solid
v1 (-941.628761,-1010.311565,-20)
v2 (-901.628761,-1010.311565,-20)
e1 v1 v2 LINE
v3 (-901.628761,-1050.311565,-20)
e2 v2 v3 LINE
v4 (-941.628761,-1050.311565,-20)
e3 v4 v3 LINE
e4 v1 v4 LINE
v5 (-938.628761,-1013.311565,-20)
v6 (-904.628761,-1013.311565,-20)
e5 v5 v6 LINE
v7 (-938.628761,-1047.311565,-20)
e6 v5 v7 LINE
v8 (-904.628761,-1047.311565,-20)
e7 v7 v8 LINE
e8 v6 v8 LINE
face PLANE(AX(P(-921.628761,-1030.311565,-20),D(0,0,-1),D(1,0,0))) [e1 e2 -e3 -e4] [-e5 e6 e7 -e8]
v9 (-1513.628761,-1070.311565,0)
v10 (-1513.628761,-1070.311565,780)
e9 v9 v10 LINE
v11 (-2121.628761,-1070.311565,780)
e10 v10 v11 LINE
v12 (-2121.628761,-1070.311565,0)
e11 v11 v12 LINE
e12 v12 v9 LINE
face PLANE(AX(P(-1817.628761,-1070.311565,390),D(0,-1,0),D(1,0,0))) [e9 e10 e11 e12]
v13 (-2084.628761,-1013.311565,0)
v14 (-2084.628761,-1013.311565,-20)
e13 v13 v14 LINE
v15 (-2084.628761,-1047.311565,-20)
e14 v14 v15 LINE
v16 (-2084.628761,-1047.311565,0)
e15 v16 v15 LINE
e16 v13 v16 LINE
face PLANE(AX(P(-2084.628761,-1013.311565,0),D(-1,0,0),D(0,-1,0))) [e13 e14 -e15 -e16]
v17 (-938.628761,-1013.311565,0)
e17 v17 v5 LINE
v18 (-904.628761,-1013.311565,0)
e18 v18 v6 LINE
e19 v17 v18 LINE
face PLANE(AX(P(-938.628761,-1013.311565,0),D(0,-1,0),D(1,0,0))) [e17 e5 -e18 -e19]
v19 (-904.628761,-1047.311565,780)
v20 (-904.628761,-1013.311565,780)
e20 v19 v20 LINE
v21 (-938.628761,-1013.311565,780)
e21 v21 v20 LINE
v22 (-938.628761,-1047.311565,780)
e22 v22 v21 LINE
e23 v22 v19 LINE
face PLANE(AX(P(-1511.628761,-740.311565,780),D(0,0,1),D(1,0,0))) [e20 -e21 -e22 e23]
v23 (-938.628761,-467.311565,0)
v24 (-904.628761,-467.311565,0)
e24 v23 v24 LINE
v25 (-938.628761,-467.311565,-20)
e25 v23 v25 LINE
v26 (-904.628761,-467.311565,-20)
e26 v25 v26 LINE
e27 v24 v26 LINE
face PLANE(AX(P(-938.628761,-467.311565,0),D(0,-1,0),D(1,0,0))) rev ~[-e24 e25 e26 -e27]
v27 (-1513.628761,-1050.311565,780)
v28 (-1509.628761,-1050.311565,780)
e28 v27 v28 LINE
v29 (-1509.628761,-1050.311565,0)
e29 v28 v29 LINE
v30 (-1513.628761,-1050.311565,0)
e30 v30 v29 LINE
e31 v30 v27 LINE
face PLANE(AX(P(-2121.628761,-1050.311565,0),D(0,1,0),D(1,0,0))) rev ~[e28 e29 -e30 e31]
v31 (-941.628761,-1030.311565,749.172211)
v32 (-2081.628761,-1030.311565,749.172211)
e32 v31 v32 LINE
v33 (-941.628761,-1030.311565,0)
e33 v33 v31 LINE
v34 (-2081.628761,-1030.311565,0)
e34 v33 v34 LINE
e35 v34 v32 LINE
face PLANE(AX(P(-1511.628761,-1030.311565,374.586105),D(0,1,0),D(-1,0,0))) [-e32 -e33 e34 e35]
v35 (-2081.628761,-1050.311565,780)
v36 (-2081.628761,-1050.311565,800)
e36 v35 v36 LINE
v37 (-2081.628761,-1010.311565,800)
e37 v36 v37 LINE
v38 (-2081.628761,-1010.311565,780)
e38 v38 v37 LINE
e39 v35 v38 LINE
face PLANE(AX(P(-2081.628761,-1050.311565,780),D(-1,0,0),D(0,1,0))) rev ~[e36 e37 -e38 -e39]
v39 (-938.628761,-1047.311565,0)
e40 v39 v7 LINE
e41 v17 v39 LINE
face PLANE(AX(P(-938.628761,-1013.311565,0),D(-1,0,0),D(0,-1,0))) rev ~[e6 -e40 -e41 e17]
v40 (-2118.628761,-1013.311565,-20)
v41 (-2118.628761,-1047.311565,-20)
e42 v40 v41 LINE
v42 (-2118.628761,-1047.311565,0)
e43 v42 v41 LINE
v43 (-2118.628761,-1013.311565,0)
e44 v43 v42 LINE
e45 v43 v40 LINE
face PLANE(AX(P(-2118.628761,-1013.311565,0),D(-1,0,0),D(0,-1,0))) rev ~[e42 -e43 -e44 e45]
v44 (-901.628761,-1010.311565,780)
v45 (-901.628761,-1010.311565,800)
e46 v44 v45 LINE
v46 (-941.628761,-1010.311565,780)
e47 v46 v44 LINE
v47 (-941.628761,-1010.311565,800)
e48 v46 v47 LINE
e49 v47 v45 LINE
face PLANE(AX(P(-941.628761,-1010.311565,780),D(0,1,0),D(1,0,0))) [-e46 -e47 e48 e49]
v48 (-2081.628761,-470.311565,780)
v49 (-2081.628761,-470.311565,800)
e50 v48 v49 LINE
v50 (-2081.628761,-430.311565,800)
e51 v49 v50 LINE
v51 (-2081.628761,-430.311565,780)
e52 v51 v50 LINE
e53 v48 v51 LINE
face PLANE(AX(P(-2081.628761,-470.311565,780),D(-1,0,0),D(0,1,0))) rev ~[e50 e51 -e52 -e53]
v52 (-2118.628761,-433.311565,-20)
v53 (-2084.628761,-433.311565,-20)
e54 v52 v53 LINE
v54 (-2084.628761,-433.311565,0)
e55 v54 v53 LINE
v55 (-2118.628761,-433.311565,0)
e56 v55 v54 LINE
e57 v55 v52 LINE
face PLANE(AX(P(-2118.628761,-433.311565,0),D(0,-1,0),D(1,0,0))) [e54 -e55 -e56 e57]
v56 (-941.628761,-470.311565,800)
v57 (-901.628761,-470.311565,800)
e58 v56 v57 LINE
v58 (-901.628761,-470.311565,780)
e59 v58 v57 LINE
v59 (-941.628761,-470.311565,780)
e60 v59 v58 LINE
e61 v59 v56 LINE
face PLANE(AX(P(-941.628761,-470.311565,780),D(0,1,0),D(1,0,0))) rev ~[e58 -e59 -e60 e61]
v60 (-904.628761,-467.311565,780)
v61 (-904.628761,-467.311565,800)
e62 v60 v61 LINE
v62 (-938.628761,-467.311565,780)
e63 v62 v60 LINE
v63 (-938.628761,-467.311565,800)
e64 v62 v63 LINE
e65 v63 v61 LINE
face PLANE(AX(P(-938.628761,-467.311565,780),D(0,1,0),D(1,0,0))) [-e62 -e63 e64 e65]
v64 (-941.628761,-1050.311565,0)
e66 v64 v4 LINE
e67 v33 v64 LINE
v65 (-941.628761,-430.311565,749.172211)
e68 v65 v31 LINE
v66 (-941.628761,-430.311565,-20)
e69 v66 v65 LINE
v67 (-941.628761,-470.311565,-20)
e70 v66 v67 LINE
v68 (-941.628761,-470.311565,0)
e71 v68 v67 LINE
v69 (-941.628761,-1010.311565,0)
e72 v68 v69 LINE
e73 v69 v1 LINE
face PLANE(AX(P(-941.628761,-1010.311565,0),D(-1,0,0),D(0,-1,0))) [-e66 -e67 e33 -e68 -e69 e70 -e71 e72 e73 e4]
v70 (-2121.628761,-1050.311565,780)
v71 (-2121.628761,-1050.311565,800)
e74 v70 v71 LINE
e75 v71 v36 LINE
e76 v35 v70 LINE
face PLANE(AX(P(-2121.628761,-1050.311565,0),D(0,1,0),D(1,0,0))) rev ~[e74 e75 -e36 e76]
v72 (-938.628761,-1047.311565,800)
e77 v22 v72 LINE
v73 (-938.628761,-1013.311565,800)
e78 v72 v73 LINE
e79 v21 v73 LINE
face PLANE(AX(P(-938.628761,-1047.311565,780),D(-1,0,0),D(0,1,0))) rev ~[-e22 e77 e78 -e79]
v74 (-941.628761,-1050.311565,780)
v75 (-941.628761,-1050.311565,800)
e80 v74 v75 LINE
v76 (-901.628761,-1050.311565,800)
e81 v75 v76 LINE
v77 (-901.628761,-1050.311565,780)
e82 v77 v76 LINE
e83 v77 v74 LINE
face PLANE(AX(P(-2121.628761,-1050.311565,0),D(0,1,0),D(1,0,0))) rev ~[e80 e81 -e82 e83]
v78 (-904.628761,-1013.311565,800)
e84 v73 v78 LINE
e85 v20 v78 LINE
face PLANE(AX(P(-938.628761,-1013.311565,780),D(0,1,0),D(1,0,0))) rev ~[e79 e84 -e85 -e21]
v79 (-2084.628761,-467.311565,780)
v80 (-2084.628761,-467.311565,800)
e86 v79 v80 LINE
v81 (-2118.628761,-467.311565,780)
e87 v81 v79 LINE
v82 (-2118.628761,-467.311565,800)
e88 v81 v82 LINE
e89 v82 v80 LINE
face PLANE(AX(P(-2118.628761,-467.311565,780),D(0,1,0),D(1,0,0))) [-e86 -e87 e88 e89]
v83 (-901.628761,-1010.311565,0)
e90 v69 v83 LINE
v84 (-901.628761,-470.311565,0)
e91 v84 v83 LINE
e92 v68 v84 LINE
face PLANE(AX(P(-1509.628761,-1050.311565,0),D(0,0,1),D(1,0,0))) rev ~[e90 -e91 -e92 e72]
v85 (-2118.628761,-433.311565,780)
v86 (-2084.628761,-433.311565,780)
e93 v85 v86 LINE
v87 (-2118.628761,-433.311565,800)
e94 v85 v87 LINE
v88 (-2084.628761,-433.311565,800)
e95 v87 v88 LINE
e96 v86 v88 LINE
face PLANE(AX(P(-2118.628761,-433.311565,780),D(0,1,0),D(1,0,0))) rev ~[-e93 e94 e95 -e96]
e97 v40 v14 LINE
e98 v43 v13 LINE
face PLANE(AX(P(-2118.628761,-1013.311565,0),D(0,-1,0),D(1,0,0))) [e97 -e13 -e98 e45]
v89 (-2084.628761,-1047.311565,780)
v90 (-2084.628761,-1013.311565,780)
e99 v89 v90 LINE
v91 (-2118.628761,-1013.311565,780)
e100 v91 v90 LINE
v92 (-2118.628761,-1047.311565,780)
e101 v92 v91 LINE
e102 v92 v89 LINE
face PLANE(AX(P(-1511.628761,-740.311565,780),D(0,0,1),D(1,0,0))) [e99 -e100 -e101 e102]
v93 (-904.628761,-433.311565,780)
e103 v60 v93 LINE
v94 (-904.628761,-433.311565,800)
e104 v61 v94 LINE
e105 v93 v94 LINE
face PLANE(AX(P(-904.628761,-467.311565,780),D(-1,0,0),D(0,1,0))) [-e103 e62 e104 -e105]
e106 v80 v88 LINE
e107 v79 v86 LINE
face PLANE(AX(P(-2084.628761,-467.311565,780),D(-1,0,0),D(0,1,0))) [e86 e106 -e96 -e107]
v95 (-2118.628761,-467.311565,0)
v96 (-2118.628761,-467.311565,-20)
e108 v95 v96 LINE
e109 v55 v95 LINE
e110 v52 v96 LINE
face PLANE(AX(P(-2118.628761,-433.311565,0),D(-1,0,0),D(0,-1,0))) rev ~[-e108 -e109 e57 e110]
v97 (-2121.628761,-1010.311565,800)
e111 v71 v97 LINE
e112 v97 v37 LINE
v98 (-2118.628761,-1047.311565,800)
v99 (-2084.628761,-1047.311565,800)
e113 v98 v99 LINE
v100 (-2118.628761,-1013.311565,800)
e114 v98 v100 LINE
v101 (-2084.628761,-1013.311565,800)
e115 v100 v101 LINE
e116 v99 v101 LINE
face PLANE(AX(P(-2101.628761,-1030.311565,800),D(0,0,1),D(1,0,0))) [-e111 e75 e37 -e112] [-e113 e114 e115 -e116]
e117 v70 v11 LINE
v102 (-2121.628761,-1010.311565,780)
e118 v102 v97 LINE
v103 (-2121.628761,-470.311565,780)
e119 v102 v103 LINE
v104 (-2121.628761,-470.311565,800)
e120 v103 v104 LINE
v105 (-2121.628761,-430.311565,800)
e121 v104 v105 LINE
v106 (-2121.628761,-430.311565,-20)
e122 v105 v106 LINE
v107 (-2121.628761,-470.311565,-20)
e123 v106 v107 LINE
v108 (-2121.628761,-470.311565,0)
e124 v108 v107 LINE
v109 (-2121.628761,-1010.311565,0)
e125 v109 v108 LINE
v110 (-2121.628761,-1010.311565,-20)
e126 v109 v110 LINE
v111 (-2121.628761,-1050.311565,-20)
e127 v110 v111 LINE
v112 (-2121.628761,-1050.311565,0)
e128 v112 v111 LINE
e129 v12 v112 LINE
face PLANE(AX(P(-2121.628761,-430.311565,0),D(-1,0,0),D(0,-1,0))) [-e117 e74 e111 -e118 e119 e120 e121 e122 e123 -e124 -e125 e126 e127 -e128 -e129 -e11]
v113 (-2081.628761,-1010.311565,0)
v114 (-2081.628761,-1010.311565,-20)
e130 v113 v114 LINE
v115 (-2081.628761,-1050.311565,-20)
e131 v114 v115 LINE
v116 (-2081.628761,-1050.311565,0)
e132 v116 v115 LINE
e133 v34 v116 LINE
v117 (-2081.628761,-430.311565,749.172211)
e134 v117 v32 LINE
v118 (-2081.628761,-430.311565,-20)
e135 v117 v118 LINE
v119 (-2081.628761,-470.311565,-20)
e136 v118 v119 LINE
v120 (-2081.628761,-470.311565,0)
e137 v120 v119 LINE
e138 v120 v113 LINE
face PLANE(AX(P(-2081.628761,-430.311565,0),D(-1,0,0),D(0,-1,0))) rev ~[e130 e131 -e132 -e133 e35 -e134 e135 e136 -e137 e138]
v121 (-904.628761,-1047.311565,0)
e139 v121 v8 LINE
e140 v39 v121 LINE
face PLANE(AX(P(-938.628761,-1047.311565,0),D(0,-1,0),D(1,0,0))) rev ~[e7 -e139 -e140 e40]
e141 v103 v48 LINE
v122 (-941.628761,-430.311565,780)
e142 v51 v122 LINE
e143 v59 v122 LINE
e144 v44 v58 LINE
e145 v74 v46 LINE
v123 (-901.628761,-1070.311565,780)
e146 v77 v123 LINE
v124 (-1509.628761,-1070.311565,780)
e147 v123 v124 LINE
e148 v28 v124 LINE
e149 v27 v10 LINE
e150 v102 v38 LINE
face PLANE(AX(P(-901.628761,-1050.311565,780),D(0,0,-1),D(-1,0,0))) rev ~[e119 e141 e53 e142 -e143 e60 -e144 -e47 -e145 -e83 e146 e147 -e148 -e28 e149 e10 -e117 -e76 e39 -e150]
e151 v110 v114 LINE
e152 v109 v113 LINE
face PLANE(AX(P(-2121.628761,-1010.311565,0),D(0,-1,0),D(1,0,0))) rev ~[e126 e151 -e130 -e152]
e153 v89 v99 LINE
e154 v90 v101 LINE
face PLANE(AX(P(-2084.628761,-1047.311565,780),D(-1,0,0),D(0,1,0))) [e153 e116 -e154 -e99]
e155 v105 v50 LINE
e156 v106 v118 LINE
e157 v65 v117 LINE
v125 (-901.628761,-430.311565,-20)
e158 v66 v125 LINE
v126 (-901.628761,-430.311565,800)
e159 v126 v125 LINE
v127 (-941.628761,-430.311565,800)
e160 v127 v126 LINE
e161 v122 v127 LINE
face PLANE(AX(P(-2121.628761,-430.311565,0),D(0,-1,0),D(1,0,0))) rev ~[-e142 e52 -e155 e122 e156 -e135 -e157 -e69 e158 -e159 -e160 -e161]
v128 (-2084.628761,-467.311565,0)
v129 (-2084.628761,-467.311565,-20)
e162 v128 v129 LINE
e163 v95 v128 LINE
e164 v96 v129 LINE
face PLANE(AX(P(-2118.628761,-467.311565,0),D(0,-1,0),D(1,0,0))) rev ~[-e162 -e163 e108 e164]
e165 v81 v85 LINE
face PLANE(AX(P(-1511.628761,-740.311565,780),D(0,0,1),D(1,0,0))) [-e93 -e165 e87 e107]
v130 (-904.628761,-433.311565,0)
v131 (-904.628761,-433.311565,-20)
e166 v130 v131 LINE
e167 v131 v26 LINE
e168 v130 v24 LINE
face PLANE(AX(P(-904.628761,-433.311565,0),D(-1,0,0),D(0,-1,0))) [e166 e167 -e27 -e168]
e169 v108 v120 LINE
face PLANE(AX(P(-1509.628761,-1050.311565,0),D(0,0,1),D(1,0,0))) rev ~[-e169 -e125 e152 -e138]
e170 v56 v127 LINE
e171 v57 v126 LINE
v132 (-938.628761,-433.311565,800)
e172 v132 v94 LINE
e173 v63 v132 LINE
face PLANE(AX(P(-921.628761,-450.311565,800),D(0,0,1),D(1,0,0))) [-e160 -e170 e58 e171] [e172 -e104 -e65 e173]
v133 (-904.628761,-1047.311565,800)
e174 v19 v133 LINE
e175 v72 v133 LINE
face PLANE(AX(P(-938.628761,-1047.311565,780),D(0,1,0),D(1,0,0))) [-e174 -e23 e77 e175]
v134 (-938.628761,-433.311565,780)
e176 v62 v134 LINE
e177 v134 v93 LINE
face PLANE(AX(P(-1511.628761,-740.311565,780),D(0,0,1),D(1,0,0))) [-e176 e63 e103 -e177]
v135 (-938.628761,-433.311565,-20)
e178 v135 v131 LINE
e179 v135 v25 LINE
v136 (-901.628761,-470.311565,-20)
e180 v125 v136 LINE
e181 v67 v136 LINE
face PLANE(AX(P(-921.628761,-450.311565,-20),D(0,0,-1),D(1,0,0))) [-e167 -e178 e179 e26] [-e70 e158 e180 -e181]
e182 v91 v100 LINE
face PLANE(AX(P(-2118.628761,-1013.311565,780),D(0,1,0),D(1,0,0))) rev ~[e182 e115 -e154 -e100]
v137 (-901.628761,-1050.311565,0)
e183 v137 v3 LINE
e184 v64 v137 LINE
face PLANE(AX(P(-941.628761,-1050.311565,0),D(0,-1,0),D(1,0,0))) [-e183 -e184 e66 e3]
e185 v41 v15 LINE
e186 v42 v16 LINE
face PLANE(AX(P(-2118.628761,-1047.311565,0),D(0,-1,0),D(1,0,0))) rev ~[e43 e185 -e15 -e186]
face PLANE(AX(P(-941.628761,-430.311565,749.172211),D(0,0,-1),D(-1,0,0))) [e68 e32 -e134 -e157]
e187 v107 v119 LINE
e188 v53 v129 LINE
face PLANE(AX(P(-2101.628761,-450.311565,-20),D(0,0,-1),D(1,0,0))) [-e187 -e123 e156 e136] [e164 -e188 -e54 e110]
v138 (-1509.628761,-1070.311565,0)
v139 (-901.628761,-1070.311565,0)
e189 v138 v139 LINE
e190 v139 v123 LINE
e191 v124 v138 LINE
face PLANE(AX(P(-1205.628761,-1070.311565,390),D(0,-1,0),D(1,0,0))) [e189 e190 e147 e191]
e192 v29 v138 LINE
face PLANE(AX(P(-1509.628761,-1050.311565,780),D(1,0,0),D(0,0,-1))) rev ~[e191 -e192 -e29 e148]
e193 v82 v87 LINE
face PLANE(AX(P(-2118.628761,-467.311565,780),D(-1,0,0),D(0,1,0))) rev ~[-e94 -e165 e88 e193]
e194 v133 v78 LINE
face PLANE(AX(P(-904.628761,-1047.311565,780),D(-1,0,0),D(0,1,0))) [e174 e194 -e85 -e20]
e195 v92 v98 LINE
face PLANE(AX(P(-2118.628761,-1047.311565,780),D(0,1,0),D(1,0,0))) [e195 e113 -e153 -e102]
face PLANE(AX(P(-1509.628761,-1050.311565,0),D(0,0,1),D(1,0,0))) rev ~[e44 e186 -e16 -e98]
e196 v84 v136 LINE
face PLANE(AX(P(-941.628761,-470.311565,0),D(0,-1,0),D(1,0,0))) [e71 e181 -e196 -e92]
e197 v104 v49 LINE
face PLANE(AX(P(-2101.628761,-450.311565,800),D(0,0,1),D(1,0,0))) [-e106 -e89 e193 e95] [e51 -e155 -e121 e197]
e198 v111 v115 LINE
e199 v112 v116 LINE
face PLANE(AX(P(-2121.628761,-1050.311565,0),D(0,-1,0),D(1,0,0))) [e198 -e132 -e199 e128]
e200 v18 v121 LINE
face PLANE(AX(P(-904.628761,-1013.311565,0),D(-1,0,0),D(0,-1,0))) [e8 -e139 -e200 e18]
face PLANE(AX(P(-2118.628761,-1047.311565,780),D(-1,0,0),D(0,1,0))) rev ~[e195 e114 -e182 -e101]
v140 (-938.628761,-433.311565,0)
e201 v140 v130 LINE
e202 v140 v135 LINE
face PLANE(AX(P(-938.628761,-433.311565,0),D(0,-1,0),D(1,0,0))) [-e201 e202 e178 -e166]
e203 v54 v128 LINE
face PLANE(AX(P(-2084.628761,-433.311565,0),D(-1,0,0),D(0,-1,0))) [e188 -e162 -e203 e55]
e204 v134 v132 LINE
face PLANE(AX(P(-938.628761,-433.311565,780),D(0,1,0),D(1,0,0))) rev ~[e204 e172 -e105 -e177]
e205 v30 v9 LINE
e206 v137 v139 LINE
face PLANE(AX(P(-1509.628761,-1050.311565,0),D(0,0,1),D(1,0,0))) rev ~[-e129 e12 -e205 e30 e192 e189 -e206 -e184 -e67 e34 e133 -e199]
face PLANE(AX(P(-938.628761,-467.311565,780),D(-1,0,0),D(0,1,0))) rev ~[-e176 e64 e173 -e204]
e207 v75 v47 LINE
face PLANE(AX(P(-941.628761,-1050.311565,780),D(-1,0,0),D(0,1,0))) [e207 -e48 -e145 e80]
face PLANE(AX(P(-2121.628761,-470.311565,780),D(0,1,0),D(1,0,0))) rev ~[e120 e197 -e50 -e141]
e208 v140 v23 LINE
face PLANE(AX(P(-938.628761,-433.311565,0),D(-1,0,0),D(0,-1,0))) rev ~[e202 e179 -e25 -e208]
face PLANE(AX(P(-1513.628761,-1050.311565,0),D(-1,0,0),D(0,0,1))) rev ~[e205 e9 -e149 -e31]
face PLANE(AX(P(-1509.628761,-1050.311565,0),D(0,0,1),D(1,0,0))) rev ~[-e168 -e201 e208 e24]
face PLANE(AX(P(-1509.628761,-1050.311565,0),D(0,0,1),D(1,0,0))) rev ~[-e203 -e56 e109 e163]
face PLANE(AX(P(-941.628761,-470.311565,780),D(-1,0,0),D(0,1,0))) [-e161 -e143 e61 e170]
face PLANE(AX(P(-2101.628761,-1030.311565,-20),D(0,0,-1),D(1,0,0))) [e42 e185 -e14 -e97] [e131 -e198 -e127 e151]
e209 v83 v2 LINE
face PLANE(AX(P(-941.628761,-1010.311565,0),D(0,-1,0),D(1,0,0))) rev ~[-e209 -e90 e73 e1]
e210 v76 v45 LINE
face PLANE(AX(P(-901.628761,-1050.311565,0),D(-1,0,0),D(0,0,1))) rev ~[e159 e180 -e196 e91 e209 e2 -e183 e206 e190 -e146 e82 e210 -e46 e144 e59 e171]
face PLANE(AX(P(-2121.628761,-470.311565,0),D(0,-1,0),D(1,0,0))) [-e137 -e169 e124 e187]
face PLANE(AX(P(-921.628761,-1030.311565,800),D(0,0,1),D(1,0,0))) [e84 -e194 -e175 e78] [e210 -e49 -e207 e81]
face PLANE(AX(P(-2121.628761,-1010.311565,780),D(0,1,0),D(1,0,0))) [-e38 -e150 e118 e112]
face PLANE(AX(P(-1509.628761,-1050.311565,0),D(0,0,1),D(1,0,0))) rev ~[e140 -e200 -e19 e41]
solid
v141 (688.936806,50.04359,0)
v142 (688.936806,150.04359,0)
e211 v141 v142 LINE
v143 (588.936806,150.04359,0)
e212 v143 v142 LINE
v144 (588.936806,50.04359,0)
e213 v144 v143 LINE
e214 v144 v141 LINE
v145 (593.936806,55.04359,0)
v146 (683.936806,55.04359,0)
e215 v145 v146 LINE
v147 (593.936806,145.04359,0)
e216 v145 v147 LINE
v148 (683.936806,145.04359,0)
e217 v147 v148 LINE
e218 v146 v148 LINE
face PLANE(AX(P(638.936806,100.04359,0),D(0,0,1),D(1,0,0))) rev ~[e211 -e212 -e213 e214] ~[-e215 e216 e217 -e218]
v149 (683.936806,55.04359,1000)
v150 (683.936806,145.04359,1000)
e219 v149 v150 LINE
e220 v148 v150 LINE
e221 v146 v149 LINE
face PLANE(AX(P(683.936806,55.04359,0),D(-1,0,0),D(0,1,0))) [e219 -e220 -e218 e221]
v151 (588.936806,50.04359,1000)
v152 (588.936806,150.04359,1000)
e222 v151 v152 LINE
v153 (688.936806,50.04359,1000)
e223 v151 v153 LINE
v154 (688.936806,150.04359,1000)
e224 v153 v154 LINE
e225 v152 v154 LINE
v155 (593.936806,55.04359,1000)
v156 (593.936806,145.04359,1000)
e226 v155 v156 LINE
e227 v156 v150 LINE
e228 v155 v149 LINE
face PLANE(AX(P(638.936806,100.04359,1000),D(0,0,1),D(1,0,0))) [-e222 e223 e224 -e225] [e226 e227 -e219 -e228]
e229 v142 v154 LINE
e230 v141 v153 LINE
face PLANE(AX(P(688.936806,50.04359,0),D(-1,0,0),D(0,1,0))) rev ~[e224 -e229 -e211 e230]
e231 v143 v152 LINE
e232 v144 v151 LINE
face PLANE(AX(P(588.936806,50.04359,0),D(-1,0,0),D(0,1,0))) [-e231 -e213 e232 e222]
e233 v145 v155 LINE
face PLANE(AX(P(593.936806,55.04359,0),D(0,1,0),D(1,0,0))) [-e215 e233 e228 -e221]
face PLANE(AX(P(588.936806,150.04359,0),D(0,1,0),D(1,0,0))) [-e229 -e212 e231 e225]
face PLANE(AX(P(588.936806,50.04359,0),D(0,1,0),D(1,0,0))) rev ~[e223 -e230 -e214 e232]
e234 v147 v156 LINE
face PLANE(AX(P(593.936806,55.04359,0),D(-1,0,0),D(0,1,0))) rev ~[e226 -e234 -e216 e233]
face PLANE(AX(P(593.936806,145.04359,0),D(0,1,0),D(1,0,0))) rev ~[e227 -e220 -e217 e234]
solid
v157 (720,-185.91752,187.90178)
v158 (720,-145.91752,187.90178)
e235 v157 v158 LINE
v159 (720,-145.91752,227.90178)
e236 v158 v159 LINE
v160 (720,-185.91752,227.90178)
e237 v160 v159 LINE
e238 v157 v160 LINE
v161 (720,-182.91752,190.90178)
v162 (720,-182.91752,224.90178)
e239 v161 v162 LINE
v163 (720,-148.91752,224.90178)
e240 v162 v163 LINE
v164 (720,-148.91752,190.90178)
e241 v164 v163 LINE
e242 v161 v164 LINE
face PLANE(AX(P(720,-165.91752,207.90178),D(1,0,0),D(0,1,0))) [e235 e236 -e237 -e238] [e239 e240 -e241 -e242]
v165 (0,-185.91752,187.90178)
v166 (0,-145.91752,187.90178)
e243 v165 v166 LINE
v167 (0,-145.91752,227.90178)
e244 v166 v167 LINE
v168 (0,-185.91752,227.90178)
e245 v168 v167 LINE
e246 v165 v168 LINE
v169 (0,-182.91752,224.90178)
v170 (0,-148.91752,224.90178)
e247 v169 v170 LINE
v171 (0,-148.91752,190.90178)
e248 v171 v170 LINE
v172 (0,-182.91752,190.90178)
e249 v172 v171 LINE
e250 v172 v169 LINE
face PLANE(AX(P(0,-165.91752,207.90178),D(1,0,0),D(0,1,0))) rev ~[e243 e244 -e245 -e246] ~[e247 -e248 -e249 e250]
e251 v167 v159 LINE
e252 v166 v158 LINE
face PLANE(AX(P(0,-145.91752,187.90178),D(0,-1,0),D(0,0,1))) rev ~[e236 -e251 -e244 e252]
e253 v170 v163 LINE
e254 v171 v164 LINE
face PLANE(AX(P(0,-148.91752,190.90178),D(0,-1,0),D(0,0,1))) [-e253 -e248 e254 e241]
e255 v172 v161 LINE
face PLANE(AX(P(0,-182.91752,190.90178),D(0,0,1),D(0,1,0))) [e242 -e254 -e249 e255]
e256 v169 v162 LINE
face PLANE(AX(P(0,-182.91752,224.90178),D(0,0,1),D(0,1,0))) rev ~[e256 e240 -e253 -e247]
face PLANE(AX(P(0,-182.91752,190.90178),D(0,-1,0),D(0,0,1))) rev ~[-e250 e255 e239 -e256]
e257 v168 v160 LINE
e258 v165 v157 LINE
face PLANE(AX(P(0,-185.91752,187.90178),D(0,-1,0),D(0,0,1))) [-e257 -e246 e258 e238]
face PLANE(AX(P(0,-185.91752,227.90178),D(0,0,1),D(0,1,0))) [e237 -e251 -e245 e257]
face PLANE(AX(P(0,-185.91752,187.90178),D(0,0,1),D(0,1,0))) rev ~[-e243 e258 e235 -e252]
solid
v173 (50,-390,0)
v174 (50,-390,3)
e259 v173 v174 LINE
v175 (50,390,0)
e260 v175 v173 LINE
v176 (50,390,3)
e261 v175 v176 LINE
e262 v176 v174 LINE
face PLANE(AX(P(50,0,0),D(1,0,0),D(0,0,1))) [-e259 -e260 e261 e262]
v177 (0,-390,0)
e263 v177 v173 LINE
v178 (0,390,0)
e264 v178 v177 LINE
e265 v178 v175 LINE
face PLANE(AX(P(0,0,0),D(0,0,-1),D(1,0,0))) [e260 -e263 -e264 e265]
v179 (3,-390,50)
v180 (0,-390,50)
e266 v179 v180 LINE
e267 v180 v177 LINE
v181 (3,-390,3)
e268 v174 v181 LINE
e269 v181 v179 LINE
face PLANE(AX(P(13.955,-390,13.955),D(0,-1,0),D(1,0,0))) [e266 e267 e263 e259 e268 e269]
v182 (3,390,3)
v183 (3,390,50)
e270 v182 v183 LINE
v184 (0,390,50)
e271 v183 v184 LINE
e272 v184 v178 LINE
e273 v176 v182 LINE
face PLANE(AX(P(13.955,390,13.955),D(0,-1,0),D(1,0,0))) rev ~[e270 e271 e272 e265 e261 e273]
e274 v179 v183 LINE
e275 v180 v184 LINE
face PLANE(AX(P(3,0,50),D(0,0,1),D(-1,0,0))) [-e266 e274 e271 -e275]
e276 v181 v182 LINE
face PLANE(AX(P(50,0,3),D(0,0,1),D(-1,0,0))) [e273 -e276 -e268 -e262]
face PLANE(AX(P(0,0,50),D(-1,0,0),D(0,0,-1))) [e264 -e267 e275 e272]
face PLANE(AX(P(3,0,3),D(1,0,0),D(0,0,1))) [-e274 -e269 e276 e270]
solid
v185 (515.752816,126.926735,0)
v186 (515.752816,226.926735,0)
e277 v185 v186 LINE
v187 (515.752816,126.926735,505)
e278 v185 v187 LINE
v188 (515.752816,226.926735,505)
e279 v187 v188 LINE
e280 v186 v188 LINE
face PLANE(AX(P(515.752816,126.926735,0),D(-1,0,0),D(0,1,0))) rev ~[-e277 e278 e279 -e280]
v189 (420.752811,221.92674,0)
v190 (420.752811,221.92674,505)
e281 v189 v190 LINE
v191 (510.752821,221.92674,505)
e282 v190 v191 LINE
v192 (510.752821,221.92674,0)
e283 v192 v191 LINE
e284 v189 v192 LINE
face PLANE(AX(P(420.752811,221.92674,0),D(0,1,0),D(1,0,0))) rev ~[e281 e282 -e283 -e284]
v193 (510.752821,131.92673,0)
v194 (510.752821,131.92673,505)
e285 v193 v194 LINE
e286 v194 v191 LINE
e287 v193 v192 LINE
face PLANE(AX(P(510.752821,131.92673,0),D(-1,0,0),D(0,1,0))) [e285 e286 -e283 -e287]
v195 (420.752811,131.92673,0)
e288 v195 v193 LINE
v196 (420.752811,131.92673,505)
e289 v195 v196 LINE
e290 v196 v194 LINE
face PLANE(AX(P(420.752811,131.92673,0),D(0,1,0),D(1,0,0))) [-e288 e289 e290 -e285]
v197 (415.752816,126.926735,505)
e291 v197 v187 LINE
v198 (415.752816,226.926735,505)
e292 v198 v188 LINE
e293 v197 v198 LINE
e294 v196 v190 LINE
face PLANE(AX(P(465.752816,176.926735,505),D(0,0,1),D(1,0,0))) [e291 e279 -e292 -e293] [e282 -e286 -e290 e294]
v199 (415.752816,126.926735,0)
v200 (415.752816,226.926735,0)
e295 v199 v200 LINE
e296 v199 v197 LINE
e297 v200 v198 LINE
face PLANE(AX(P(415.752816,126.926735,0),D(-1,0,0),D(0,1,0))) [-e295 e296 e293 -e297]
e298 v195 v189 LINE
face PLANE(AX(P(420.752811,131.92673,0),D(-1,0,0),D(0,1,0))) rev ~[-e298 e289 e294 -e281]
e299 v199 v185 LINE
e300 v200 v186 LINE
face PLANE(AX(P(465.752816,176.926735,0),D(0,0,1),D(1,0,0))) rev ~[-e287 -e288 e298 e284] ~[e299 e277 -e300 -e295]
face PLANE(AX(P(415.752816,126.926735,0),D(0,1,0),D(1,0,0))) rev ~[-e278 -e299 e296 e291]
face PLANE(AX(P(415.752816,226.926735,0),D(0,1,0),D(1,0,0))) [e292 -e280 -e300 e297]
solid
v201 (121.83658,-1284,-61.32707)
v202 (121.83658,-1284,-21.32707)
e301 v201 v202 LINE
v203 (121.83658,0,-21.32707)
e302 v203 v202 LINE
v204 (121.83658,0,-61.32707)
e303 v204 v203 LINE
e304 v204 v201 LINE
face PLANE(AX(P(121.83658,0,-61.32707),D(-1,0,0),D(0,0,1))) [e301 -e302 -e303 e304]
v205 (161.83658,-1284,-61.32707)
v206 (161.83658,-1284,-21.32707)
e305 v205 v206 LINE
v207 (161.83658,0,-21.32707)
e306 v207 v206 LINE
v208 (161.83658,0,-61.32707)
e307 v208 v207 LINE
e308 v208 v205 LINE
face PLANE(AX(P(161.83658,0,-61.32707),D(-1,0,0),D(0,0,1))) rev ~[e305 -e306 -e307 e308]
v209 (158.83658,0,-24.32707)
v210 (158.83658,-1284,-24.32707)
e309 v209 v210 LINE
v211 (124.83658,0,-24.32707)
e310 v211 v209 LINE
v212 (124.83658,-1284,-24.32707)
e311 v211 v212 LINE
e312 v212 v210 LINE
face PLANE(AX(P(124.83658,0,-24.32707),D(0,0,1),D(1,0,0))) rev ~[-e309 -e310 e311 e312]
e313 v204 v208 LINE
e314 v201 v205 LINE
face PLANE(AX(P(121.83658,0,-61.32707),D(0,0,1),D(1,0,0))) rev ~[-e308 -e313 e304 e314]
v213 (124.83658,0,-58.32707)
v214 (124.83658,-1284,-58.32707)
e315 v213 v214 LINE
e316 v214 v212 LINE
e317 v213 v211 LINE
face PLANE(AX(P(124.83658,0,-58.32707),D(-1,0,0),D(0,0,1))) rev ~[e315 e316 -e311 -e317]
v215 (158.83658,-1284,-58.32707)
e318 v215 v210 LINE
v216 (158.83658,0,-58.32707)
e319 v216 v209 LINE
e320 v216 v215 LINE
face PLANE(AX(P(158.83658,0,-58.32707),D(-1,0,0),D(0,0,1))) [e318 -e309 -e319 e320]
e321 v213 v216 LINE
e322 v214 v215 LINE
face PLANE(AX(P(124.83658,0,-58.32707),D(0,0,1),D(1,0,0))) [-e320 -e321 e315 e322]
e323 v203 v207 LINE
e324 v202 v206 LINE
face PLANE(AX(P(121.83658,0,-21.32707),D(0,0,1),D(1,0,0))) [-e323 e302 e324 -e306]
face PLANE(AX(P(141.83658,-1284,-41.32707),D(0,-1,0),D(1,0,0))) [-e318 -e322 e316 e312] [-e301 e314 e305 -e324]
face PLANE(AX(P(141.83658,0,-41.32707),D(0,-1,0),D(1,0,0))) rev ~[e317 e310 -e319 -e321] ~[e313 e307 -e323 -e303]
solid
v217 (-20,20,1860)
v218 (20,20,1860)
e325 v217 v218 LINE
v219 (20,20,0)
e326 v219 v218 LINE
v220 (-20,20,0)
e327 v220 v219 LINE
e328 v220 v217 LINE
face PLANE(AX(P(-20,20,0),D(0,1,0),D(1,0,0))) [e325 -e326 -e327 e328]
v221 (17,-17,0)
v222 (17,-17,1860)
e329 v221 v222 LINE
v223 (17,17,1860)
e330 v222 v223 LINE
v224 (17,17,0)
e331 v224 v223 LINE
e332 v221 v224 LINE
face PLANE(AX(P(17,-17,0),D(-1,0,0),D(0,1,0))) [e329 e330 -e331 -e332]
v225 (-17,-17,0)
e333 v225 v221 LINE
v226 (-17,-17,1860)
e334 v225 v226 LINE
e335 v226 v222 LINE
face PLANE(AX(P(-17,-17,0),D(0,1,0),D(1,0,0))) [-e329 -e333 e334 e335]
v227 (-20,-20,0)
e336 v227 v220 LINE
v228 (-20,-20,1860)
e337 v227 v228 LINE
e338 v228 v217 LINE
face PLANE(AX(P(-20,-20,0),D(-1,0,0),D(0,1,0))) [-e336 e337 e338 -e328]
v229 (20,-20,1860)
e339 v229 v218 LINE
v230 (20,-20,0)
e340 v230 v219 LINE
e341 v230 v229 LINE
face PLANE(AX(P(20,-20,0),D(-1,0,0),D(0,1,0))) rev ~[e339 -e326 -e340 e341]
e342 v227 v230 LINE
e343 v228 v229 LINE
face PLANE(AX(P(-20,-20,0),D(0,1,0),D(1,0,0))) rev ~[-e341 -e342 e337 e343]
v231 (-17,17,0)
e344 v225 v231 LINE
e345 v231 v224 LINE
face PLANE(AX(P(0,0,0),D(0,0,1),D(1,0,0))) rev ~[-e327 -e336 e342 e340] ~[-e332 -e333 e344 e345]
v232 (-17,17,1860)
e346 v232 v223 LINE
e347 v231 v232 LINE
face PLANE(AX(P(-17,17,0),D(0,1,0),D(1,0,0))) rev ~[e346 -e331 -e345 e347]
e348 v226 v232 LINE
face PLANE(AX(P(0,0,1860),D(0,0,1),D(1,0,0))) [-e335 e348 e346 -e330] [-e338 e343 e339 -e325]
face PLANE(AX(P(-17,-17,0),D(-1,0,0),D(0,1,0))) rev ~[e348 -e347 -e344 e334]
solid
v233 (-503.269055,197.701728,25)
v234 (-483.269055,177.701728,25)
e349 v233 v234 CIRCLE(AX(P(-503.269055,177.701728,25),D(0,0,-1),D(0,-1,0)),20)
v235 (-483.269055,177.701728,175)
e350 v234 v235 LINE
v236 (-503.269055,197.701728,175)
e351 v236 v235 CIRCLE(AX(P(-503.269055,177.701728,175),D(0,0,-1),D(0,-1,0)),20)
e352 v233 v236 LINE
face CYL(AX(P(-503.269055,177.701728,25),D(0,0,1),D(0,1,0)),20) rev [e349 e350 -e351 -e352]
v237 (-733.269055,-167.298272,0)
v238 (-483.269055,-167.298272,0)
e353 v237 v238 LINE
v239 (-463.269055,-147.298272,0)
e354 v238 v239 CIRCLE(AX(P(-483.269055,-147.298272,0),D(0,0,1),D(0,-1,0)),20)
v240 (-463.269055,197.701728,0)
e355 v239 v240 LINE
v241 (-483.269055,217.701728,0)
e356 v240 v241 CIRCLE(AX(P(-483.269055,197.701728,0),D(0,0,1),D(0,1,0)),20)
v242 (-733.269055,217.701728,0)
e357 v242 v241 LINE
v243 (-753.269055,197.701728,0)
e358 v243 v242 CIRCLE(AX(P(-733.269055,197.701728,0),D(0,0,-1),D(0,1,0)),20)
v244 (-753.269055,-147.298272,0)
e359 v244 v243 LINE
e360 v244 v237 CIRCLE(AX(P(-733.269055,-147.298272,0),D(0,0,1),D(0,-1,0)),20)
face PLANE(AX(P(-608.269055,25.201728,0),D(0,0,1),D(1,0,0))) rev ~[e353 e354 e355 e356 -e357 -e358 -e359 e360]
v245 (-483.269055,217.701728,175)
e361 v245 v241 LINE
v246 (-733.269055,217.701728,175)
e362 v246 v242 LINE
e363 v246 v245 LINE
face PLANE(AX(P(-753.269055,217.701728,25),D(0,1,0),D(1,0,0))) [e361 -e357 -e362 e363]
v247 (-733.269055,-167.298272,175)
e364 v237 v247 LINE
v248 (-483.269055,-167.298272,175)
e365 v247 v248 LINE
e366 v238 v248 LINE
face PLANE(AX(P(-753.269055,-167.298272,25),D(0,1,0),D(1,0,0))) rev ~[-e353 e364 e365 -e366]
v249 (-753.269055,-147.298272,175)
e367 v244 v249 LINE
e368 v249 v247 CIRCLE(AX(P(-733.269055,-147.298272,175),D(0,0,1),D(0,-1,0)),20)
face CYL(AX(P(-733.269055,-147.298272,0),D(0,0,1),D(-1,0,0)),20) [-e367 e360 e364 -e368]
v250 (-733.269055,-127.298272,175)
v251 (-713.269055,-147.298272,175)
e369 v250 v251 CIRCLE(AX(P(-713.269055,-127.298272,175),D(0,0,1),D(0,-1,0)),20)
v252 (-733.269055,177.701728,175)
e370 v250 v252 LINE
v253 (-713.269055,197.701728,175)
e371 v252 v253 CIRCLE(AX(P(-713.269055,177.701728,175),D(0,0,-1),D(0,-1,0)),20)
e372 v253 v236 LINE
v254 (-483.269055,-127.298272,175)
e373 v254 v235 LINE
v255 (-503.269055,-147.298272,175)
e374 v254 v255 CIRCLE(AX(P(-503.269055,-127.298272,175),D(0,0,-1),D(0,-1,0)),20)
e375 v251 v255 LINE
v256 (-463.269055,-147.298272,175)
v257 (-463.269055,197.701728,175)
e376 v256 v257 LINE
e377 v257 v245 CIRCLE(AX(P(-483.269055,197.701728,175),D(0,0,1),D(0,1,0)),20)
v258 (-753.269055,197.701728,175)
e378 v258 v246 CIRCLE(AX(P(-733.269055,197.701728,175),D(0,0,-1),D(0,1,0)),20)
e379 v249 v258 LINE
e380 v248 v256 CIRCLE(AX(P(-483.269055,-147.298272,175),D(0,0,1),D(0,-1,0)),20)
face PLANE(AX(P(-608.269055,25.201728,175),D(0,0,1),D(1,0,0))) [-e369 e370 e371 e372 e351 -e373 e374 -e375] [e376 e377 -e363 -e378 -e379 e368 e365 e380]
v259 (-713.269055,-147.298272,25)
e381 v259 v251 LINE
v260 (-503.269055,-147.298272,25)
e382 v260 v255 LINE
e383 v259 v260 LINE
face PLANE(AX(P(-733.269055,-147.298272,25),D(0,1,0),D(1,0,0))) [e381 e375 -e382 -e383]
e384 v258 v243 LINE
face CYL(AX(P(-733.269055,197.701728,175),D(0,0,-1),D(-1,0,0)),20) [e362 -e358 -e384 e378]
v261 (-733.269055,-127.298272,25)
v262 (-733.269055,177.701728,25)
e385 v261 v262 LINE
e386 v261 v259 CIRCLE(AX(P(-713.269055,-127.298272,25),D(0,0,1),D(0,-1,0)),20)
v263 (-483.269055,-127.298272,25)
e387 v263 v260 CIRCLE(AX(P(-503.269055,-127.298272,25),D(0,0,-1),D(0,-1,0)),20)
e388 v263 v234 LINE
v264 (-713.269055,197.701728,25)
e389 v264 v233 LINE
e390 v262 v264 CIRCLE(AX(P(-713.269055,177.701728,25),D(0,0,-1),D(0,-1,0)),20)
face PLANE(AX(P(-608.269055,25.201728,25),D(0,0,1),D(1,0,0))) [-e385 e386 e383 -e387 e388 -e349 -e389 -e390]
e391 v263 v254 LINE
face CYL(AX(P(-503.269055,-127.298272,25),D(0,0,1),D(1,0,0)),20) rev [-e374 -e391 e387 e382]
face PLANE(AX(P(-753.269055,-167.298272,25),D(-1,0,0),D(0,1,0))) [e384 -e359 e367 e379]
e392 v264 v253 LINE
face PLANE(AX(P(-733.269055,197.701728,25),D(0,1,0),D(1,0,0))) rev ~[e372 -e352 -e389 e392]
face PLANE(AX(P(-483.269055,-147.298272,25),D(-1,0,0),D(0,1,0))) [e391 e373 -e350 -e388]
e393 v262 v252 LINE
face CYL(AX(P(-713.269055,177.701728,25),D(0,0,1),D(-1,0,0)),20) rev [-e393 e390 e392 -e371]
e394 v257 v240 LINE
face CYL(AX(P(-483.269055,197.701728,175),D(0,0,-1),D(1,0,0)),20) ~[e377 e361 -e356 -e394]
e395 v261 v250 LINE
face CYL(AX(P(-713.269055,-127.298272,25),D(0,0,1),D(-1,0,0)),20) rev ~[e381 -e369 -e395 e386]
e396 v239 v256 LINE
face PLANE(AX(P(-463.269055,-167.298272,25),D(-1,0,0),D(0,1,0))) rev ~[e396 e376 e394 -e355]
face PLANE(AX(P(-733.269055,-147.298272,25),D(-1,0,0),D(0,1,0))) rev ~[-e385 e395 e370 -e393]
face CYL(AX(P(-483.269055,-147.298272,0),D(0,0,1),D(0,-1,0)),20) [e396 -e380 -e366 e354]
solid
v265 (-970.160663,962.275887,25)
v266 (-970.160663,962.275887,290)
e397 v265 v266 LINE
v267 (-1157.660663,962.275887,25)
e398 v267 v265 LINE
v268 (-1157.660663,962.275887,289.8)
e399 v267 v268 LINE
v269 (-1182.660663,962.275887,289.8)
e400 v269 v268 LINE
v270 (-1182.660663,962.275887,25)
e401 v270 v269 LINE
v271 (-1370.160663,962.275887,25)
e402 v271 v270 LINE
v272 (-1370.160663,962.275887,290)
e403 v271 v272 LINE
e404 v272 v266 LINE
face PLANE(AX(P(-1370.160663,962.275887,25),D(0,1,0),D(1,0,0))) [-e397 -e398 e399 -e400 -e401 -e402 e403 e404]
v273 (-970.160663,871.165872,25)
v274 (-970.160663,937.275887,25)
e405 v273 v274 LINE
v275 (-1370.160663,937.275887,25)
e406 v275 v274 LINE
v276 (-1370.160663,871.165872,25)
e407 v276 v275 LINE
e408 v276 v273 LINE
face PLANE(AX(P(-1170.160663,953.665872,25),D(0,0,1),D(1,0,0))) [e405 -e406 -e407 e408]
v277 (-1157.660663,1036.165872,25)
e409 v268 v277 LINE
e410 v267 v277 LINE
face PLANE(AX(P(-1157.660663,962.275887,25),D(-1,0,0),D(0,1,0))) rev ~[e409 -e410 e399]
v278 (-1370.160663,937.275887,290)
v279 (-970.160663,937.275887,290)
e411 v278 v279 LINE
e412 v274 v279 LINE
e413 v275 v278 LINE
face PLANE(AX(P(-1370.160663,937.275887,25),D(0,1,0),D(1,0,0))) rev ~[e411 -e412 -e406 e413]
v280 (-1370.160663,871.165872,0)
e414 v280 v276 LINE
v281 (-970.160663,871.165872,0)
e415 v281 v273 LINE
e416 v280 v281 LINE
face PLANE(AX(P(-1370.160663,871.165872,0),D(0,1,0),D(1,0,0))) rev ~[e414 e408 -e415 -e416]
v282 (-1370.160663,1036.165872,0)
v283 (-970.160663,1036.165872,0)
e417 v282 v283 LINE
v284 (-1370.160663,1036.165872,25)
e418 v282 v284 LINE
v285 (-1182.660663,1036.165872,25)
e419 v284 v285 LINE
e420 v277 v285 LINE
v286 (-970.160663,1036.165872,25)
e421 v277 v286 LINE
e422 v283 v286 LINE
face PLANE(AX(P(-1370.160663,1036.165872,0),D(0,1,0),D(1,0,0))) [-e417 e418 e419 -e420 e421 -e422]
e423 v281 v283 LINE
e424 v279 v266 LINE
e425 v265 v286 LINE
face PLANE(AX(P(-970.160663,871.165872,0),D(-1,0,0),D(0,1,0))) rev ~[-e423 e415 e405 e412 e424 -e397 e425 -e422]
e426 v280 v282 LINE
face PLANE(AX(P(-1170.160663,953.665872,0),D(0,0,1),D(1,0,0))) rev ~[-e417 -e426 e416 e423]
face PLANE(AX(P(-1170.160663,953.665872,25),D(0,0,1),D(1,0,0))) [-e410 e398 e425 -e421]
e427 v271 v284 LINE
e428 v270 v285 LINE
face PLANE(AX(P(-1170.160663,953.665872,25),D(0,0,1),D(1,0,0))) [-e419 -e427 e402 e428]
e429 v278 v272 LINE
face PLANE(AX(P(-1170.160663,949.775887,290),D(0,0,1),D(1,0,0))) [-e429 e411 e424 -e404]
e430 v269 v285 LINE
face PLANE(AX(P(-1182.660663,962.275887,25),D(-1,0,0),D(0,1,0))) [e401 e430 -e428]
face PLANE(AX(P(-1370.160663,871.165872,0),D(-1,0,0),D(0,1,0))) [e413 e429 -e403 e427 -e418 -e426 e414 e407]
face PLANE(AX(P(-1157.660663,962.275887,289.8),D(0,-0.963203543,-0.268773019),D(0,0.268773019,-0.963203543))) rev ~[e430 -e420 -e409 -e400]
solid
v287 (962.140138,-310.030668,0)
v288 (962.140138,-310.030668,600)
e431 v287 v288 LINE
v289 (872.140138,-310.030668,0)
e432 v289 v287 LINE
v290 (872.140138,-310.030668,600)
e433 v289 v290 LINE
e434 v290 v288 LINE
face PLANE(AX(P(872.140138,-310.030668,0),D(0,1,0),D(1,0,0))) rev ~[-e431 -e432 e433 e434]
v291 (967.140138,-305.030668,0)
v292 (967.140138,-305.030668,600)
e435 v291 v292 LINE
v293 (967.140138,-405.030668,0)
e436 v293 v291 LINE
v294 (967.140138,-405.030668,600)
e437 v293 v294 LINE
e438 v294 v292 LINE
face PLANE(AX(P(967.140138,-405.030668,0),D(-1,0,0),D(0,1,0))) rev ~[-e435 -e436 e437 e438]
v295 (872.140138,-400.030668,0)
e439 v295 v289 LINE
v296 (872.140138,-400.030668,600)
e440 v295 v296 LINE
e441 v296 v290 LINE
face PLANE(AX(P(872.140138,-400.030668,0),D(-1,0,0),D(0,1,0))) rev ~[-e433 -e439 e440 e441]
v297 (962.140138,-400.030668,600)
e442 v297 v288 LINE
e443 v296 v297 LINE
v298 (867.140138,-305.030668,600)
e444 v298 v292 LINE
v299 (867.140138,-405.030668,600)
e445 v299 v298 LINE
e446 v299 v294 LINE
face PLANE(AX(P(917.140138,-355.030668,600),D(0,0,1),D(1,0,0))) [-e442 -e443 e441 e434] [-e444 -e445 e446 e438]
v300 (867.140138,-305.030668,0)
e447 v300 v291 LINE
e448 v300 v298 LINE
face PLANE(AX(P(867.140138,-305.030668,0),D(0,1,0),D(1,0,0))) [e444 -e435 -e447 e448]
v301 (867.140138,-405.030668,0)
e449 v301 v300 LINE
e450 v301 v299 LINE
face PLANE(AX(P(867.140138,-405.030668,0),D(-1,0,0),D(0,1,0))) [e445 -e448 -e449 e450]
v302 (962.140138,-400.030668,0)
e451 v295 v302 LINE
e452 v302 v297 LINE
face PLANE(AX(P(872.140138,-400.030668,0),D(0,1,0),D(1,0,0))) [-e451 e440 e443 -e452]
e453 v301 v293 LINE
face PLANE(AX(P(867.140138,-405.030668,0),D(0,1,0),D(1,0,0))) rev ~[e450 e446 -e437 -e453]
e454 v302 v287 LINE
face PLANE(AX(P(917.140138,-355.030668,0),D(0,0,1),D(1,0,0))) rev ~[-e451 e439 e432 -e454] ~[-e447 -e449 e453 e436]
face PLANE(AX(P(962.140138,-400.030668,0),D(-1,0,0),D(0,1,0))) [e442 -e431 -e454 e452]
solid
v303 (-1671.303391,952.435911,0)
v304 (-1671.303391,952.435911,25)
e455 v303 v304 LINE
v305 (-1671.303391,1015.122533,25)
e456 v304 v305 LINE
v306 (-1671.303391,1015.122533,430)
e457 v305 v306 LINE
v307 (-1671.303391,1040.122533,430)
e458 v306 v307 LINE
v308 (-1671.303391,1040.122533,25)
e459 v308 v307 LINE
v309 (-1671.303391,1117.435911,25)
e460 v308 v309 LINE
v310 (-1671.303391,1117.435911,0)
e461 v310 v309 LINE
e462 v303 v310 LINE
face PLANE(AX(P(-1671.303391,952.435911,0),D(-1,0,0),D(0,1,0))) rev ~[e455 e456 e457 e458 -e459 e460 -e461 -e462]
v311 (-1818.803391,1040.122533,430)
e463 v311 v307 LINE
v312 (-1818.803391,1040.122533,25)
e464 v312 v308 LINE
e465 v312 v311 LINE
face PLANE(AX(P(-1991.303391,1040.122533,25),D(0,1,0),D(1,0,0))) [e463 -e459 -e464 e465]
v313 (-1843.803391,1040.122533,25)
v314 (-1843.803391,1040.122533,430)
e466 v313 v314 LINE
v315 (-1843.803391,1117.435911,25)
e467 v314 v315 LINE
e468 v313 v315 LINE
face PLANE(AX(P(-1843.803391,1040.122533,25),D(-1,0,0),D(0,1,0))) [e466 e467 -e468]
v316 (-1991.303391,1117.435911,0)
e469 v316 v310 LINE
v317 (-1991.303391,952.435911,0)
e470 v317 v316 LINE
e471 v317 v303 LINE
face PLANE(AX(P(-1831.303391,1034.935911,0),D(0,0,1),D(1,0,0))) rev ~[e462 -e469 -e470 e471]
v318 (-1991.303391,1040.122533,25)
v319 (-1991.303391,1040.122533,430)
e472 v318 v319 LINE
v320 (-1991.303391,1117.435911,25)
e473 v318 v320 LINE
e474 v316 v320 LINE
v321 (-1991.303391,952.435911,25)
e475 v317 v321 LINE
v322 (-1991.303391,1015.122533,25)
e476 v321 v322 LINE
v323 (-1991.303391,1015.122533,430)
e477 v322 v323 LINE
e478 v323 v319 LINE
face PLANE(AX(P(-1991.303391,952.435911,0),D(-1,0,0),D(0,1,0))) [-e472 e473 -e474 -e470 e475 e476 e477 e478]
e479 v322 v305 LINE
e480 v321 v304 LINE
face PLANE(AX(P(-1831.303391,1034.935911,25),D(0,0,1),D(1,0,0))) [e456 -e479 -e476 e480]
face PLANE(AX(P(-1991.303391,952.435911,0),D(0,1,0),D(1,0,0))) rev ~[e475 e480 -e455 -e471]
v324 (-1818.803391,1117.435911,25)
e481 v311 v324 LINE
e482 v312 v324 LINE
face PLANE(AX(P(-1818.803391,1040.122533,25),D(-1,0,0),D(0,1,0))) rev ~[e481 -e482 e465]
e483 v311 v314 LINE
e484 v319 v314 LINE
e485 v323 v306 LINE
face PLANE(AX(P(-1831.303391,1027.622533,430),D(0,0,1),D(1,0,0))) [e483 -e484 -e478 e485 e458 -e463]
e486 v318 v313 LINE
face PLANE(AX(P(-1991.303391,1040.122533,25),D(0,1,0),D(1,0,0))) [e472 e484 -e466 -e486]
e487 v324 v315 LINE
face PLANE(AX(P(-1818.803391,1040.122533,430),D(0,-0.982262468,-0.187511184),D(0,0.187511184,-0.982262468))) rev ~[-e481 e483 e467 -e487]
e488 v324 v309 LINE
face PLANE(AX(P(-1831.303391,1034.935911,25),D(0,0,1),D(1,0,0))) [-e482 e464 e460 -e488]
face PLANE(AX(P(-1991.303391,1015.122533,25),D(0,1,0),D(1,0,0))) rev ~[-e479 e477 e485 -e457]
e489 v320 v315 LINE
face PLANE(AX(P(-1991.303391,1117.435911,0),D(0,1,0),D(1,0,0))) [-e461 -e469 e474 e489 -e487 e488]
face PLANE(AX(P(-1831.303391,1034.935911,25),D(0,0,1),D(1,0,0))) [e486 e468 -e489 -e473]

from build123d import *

# Parameters (mm, degrees)
F1_DEPTH  = 390
F2_W      = 40
F2_H      = 40
F2_W_2    = 34
F2_H_2    = 34
F3_DEPTH  = 1860
F4_W      = 40
F4_H      = 40
F4_W_2    = 34
F4_H_2    = 34
F5_DEPTH  = 720
F6_W      = 40
F6_H      = 40
F6_W_2    = 34
F6_H_2    = 34
F7_DEPTH  = 1284
F8_W      = 290
F8_H      = 385
F9_DEPTH  = 25
F10_W     = 290
F10_H     = 385
F10_W_2   = 250
F10_H_2   = 345
F11_DEPTH = 150
F12_R     = 20
F13_W     = 100
F13_H     = 100
F13_W_2   = 90.0000095367
F13_H_2   = 90.0000095367
F14_DEPTH = 505
F15_W     = 100
F15_H     = 100
F15_W_2   = 90
F15_H_2   = 90
F16_DEPTH = 600
F17_W     = 100
F17_H     = 100
F17_W_2   = 90
F17_H_2   = 90
F18_DEPTH = 1000
F19_W     = 1220
F19_H     = 620
F20_DEPTH = 780
F21_W     = 40
F21_H     = 40
F21_W_2   = 34
F21_H_2   = 34
F22_DEPTH = 20
F24_DEPTH = 20
F25_W     = 40
F25_H     = 40
F25_W_2   = 34
F25_H_2   = 34
F26_DEPTH = 20
F27_W     = 320
F27_H     = 165
F28_DEPTH = 25
F29_W     = 320
F29_H     = 25
F30_DEPTH = 405
F31_W     = 25
F31_H     = 77.3133778572
F32_DEPTH = 405
F34_DEPTH = 25
F35_W     = 400
F35_H     = 165
F36_DEPTH = 25
F37_W     = 400
F37_H     = 25
F38_DEPTH = 265
F39_W     = 25
F39_H     = 73.8899850845
F40_DEPTH = 264.8
F42_DEPTH = 25
F43_W     = 1140
F43_H     = 749.1722106934
F44_DEPTH = 600


with BuildPart() as f1:
    # F0 (on Front) → F1 (new body, symmetric)
    with BuildSketch(Plane.XZ):
        Polygon((0, 50), (0, 0), (50, 0), (50, 3), (3, 3), (3, 50), align=None)
    extrude(amount=F1_DEPTH, both=True)


with BuildPart() as f3:
    # F2 (on Top) → F3 (new body)
    with BuildSketch(Plane.XY):
        Rectangle(F2_W, F2_H)
        Rectangle(F2_W_2, F2_H_2, mode=Mode.SUBTRACT)
    extrude(amount=F3_DEPTH)


with BuildPart() as f5:
    # F4 (on Right) → F5 (new body)
    with BuildSketch(Plane.YZ):
        with Locations((-165.917519927, 207.9017800093)):
            Rectangle(F4_W, F4_H)
        with Locations((-165.917519927, 207.9017800093)):
            Rectangle(F4_W_2, F4_H_2, mode=Mode.SUBTRACT)
    extrude(amount=F5_DEPTH)


with BuildPart() as f7:
    # F6 (on Front) → F7 (new body)
    with BuildSketch(Plane.XZ):
        with Locations((141.8365803361, -41.3270699978)):
            Rectangle(F6_W, F6_H)
        with Locations((141.8365803361, -41.3270699978)):
            Rectangle(F6_W_2, F6_H_2, mode=Mode.SUBTRACT)
    extrude(amount=F7_DEPTH)


with BuildPart() as f9:
    # F8 (on Top) → F9 (new body)
    with BuildSketch(Plane.XY):
        with Locations((-608.2690548897, 25.2017277479)):
            Rectangle(F8_W, F8_H)
    extrude(amount=F9_DEPTH)

    # F10 (on face) → F11 (join)
    with BuildSketch(Plane.XY.offset(25)):
        with Locations((-608.2690548897, 25.2017277479)):
            Rectangle(F10_W, F10_H)
        with Locations((-608.2690548897, 25.2017277479)):
            Rectangle(F10_W_2, F10_H_2, mode=Mode.SUBTRACT)
    extrude(amount=F11_DEPTH)

    # F12
    f12_edges = [f9.edges().sort_by_distance(p)[0] for p in [
        (-463.269055, -167.298272, 87.5),
        (-463.269055, 217.701728, 87.5),
        (-753.269055, -167.298272, 87.5),
        (-753.269055, 217.701728, 87.5),
        (-733.269055, 197.701728, 100),
        (-483.269055, 197.701728, 100),
        (-483.269055, -147.298272, 100),
        (-733.269055, -147.298272, 100),
    ]]
    fillet(f12_edges, radius=F12_R)


with BuildPart() as f14:
    # F13 (on Top) → F14 (new body)
    with BuildSketch(Plane.XY):
        with Locations((465.7528162003, 176.9267350435)):
            Rectangle(F13_W, F13_H)
        with Locations((465.7528162003, 176.9267350435)):
            Rectangle(F13_W_2, F13_H_2, mode=Mode.SUBTRACT)
    extrude(amount=F14_DEPTH)


with BuildPart() as f16:
    # F15 (on Top) → F16 (new body)
    with BuildSketch(Plane.XY):
        with Locations((917.1401381493, -355.0306677818)):
            Rectangle(F15_W, F15_H)
        with Locations((917.1401381493, -355.0306677818)):
            Rectangle(F15_W_2, F15_H_2, mode=Mode.SUBTRACT)
    extrude(amount=F16_DEPTH)


with BuildPart() as f18:
    # F17 (on Top) → F18 (new body)
    with BuildSketch(Plane.XY):
        with Locations((638.9368057251, 100.0435903668)):
            Rectangle(F17_W, F17_H)
        with Locations((638.9368057251, 100.0435903668)):
            Rectangle(F17_W_2, F17_H_2, mode=Mode.SUBTRACT)
    extrude(amount=F18_DEPTH)


with BuildPart() as f20:
    # F19 (on Top) → F20 (new body)
    with BuildSketch(Plane.XY):
        with Locations((-1511.6287612915, -740.3115653992)):
            Rectangle(F19_W, F19_H)
    extrude(amount=F20_DEPTH)

    # F21 (on face) → F22 (join)
    with BuildSketch(Plane.XY.offset(780)):
        with Locations((-2101.6287612915, -450.3115653992)):
            Rectangle(F21_W, F21_H)
        with Locations((-2101.6287612915, -450.3115653992)):
            Rectangle(F21_W_2, F21_H_2, mode=Mode.SUBTRACT)
        with Locations((-921.6287612915, -450.3115653992)):
            Rectangle(F21_W, F21_H)
        with Locations((-921.6287612915, -450.3115653992)):
            Rectangle(F21_W_2, F21_H_2, mode=Mode.SUBTRACT)
        with Locations((-921.6287612915, -1030.3115653992)):
            Rectangle(F21_W, F21_H)
        with Locations((-921.6287612915, -1030.3115653992)):
            Rectangle(F21_W_2, F21_H_2, mode=Mode.SUBTRACT)
        with Locations((-2101.6287612915, -1030.3115653992)):
            Rectangle(F21_W, F21_H)
        with Locations((-2101.6287612915, -1030.3115653992)):
            Rectangle(F21_W_2, F21_H_2, mode=Mode.SUBTRACT)
    extrude(amount=F22_DEPTH)

    # F23 (on face) → F24 (join)
    with BuildSketch(Plane.XZ.offset(1050.3115653992)):
        Polygon((-941.6287612915, 780), (-1509.6287612915, 780), (-1509.6287612915, 0), (-901.6287612915, 0), (-901.6287612915, 780), align=None)
        Polygon((-1513.6287612915, 0), (-1513.6287612915, 780), (-2081.6287612915, 780), (-2121.6287612915, 780), (-2121.6287612915, 0), align=None)
    extrude(amount=F24_DEPTH)

    # F25 (on face) → F26 (join)
    with BuildSketch(Plane(origin=(0, 0, 0), x_dir=(1, 0, 0), z_dir=(0, 0, -1))):
        with Locations((-921.6287612915, 1030.3115653992)):
            Rectangle(F25_W, F25_H)
        with Locations((-921.6287612915, 1030.3115653992)):
            Rectangle(F25_W_2, F25_H_2, mode=Mode.SUBTRACT)
        with Locations((-2101.6287612915, 1030.3115653992)):
            Rectangle(F25_W, F25_H)
        with Locations((-2101.6287612915, 1030.3115653992)):
            Rectangle(F25_W_2, F25_H_2, mode=Mode.SUBTRACT)
        with Locations((-2101.6287612915, 450.3115653992)):
            Rectangle(F25_W, F25_H)
        with Locations((-2101.6287612915, 450.3115653992)):
            Rectangle(F25_W_2, F25_H_2, mode=Mode.SUBTRACT)
        with Locations((-921.6287612915, 450.3115653992)):
            Rectangle(F25_W, F25_H)
        with Locations((-921.6287612915, 450.3115653992)):
            Rectangle(F25_W_2, F25_H_2, mode=Mode.SUBTRACT)
    extrude(amount=F26_DEPTH)

    # F43 (on face) → F44 (cut)
    with BuildSketch(Plane(origin=(0, -430.3115653992, 0), x_dir=(-1, 0, 0), z_dir=(0, 1, 0))):
        with Locations((1511.6287612915, 374.5861053467)):
            Rectangle(F43_W, F43_H)
    extrude(amount=-F44_DEPTH, mode=Mode.SUBTRACT)


with BuildPart() as f28:
    # F27 (on Top) → F28 (new body)
    with BuildSketch(Plane.XY):
        with Locations((-1831.3033914566, 1034.9359107018)):
            Rectangle(F27_W, F27_H)
    extrude(amount=F28_DEPTH)

    # F29 (on face) → F30 (join)
    with BuildSketch(Plane.XY.offset(25)):
        with Locations((-1831.3033914566, 1027.6225328445)):
            Rectangle(F29_W, F29_H)
    extrude(amount=F30_DEPTH)

    # F31 (on face) → F32 (join)
    with BuildSketch(Plane.XY.offset(25)):
        with Locations((-1831.3033914566, 1078.7792217731)):
            Rectangle(F31_W, F31_H)
    extrude(amount=F32_DEPTH)

    # F33 (on face) → F34 (cut)
    with BuildSketch(Plane.YZ.offset(-1818.8033914566)):
        Polygon((1117.4359107018, 430), (1040.1225328445, 430), (1117.4359107018, 25), align=None)
    extrude(amount=-F34_DEPTH, mode=Mode.SUBTRACT)


with BuildPart() as f36:
    # F35 (on Top) → F36 (new body)
    with BuildSketch(Plane.XY):
        with Locations((-1170.1606631279, 953.6658716202)):
            Rectangle(F35_W, F35_H)
    extrude(amount=F36_DEPTH)

    # F37 (on face) → F38 (join)
    with BuildSketch(Plane.XY.offset(25)):
        with Locations((-1170.1606631279, 949.7758865356)):
            Rectangle(F37_W, F37_H)
    extrude(amount=F38_DEPTH)

    # F39 (on face) → F40 (join)
    with BuildSketch(Plane.XY.offset(25)):
        with Locations((-1170.1606631279, 999.2208790779)):
            Rectangle(F39_W, F39_H)
    extrude(amount=F40_DEPTH)

    # F41 (on face) → F42 (cut)
    with BuildSketch(Plane.YZ.offset(-1157.6606631279)):
        Polygon((1036.1658716202, 289.8), (962.2758865356, 289.8), (1036.1658716202, 25), align=None)
    extrude(amount=-F42_DEPTH, mode=Mode.SUBTRACT)


solid = Compound([f1.part, f3.part, f5.part, f7.part, f9.part, f14.part, f16.part, f18.part, f20.part, f28.part, f36.part])
